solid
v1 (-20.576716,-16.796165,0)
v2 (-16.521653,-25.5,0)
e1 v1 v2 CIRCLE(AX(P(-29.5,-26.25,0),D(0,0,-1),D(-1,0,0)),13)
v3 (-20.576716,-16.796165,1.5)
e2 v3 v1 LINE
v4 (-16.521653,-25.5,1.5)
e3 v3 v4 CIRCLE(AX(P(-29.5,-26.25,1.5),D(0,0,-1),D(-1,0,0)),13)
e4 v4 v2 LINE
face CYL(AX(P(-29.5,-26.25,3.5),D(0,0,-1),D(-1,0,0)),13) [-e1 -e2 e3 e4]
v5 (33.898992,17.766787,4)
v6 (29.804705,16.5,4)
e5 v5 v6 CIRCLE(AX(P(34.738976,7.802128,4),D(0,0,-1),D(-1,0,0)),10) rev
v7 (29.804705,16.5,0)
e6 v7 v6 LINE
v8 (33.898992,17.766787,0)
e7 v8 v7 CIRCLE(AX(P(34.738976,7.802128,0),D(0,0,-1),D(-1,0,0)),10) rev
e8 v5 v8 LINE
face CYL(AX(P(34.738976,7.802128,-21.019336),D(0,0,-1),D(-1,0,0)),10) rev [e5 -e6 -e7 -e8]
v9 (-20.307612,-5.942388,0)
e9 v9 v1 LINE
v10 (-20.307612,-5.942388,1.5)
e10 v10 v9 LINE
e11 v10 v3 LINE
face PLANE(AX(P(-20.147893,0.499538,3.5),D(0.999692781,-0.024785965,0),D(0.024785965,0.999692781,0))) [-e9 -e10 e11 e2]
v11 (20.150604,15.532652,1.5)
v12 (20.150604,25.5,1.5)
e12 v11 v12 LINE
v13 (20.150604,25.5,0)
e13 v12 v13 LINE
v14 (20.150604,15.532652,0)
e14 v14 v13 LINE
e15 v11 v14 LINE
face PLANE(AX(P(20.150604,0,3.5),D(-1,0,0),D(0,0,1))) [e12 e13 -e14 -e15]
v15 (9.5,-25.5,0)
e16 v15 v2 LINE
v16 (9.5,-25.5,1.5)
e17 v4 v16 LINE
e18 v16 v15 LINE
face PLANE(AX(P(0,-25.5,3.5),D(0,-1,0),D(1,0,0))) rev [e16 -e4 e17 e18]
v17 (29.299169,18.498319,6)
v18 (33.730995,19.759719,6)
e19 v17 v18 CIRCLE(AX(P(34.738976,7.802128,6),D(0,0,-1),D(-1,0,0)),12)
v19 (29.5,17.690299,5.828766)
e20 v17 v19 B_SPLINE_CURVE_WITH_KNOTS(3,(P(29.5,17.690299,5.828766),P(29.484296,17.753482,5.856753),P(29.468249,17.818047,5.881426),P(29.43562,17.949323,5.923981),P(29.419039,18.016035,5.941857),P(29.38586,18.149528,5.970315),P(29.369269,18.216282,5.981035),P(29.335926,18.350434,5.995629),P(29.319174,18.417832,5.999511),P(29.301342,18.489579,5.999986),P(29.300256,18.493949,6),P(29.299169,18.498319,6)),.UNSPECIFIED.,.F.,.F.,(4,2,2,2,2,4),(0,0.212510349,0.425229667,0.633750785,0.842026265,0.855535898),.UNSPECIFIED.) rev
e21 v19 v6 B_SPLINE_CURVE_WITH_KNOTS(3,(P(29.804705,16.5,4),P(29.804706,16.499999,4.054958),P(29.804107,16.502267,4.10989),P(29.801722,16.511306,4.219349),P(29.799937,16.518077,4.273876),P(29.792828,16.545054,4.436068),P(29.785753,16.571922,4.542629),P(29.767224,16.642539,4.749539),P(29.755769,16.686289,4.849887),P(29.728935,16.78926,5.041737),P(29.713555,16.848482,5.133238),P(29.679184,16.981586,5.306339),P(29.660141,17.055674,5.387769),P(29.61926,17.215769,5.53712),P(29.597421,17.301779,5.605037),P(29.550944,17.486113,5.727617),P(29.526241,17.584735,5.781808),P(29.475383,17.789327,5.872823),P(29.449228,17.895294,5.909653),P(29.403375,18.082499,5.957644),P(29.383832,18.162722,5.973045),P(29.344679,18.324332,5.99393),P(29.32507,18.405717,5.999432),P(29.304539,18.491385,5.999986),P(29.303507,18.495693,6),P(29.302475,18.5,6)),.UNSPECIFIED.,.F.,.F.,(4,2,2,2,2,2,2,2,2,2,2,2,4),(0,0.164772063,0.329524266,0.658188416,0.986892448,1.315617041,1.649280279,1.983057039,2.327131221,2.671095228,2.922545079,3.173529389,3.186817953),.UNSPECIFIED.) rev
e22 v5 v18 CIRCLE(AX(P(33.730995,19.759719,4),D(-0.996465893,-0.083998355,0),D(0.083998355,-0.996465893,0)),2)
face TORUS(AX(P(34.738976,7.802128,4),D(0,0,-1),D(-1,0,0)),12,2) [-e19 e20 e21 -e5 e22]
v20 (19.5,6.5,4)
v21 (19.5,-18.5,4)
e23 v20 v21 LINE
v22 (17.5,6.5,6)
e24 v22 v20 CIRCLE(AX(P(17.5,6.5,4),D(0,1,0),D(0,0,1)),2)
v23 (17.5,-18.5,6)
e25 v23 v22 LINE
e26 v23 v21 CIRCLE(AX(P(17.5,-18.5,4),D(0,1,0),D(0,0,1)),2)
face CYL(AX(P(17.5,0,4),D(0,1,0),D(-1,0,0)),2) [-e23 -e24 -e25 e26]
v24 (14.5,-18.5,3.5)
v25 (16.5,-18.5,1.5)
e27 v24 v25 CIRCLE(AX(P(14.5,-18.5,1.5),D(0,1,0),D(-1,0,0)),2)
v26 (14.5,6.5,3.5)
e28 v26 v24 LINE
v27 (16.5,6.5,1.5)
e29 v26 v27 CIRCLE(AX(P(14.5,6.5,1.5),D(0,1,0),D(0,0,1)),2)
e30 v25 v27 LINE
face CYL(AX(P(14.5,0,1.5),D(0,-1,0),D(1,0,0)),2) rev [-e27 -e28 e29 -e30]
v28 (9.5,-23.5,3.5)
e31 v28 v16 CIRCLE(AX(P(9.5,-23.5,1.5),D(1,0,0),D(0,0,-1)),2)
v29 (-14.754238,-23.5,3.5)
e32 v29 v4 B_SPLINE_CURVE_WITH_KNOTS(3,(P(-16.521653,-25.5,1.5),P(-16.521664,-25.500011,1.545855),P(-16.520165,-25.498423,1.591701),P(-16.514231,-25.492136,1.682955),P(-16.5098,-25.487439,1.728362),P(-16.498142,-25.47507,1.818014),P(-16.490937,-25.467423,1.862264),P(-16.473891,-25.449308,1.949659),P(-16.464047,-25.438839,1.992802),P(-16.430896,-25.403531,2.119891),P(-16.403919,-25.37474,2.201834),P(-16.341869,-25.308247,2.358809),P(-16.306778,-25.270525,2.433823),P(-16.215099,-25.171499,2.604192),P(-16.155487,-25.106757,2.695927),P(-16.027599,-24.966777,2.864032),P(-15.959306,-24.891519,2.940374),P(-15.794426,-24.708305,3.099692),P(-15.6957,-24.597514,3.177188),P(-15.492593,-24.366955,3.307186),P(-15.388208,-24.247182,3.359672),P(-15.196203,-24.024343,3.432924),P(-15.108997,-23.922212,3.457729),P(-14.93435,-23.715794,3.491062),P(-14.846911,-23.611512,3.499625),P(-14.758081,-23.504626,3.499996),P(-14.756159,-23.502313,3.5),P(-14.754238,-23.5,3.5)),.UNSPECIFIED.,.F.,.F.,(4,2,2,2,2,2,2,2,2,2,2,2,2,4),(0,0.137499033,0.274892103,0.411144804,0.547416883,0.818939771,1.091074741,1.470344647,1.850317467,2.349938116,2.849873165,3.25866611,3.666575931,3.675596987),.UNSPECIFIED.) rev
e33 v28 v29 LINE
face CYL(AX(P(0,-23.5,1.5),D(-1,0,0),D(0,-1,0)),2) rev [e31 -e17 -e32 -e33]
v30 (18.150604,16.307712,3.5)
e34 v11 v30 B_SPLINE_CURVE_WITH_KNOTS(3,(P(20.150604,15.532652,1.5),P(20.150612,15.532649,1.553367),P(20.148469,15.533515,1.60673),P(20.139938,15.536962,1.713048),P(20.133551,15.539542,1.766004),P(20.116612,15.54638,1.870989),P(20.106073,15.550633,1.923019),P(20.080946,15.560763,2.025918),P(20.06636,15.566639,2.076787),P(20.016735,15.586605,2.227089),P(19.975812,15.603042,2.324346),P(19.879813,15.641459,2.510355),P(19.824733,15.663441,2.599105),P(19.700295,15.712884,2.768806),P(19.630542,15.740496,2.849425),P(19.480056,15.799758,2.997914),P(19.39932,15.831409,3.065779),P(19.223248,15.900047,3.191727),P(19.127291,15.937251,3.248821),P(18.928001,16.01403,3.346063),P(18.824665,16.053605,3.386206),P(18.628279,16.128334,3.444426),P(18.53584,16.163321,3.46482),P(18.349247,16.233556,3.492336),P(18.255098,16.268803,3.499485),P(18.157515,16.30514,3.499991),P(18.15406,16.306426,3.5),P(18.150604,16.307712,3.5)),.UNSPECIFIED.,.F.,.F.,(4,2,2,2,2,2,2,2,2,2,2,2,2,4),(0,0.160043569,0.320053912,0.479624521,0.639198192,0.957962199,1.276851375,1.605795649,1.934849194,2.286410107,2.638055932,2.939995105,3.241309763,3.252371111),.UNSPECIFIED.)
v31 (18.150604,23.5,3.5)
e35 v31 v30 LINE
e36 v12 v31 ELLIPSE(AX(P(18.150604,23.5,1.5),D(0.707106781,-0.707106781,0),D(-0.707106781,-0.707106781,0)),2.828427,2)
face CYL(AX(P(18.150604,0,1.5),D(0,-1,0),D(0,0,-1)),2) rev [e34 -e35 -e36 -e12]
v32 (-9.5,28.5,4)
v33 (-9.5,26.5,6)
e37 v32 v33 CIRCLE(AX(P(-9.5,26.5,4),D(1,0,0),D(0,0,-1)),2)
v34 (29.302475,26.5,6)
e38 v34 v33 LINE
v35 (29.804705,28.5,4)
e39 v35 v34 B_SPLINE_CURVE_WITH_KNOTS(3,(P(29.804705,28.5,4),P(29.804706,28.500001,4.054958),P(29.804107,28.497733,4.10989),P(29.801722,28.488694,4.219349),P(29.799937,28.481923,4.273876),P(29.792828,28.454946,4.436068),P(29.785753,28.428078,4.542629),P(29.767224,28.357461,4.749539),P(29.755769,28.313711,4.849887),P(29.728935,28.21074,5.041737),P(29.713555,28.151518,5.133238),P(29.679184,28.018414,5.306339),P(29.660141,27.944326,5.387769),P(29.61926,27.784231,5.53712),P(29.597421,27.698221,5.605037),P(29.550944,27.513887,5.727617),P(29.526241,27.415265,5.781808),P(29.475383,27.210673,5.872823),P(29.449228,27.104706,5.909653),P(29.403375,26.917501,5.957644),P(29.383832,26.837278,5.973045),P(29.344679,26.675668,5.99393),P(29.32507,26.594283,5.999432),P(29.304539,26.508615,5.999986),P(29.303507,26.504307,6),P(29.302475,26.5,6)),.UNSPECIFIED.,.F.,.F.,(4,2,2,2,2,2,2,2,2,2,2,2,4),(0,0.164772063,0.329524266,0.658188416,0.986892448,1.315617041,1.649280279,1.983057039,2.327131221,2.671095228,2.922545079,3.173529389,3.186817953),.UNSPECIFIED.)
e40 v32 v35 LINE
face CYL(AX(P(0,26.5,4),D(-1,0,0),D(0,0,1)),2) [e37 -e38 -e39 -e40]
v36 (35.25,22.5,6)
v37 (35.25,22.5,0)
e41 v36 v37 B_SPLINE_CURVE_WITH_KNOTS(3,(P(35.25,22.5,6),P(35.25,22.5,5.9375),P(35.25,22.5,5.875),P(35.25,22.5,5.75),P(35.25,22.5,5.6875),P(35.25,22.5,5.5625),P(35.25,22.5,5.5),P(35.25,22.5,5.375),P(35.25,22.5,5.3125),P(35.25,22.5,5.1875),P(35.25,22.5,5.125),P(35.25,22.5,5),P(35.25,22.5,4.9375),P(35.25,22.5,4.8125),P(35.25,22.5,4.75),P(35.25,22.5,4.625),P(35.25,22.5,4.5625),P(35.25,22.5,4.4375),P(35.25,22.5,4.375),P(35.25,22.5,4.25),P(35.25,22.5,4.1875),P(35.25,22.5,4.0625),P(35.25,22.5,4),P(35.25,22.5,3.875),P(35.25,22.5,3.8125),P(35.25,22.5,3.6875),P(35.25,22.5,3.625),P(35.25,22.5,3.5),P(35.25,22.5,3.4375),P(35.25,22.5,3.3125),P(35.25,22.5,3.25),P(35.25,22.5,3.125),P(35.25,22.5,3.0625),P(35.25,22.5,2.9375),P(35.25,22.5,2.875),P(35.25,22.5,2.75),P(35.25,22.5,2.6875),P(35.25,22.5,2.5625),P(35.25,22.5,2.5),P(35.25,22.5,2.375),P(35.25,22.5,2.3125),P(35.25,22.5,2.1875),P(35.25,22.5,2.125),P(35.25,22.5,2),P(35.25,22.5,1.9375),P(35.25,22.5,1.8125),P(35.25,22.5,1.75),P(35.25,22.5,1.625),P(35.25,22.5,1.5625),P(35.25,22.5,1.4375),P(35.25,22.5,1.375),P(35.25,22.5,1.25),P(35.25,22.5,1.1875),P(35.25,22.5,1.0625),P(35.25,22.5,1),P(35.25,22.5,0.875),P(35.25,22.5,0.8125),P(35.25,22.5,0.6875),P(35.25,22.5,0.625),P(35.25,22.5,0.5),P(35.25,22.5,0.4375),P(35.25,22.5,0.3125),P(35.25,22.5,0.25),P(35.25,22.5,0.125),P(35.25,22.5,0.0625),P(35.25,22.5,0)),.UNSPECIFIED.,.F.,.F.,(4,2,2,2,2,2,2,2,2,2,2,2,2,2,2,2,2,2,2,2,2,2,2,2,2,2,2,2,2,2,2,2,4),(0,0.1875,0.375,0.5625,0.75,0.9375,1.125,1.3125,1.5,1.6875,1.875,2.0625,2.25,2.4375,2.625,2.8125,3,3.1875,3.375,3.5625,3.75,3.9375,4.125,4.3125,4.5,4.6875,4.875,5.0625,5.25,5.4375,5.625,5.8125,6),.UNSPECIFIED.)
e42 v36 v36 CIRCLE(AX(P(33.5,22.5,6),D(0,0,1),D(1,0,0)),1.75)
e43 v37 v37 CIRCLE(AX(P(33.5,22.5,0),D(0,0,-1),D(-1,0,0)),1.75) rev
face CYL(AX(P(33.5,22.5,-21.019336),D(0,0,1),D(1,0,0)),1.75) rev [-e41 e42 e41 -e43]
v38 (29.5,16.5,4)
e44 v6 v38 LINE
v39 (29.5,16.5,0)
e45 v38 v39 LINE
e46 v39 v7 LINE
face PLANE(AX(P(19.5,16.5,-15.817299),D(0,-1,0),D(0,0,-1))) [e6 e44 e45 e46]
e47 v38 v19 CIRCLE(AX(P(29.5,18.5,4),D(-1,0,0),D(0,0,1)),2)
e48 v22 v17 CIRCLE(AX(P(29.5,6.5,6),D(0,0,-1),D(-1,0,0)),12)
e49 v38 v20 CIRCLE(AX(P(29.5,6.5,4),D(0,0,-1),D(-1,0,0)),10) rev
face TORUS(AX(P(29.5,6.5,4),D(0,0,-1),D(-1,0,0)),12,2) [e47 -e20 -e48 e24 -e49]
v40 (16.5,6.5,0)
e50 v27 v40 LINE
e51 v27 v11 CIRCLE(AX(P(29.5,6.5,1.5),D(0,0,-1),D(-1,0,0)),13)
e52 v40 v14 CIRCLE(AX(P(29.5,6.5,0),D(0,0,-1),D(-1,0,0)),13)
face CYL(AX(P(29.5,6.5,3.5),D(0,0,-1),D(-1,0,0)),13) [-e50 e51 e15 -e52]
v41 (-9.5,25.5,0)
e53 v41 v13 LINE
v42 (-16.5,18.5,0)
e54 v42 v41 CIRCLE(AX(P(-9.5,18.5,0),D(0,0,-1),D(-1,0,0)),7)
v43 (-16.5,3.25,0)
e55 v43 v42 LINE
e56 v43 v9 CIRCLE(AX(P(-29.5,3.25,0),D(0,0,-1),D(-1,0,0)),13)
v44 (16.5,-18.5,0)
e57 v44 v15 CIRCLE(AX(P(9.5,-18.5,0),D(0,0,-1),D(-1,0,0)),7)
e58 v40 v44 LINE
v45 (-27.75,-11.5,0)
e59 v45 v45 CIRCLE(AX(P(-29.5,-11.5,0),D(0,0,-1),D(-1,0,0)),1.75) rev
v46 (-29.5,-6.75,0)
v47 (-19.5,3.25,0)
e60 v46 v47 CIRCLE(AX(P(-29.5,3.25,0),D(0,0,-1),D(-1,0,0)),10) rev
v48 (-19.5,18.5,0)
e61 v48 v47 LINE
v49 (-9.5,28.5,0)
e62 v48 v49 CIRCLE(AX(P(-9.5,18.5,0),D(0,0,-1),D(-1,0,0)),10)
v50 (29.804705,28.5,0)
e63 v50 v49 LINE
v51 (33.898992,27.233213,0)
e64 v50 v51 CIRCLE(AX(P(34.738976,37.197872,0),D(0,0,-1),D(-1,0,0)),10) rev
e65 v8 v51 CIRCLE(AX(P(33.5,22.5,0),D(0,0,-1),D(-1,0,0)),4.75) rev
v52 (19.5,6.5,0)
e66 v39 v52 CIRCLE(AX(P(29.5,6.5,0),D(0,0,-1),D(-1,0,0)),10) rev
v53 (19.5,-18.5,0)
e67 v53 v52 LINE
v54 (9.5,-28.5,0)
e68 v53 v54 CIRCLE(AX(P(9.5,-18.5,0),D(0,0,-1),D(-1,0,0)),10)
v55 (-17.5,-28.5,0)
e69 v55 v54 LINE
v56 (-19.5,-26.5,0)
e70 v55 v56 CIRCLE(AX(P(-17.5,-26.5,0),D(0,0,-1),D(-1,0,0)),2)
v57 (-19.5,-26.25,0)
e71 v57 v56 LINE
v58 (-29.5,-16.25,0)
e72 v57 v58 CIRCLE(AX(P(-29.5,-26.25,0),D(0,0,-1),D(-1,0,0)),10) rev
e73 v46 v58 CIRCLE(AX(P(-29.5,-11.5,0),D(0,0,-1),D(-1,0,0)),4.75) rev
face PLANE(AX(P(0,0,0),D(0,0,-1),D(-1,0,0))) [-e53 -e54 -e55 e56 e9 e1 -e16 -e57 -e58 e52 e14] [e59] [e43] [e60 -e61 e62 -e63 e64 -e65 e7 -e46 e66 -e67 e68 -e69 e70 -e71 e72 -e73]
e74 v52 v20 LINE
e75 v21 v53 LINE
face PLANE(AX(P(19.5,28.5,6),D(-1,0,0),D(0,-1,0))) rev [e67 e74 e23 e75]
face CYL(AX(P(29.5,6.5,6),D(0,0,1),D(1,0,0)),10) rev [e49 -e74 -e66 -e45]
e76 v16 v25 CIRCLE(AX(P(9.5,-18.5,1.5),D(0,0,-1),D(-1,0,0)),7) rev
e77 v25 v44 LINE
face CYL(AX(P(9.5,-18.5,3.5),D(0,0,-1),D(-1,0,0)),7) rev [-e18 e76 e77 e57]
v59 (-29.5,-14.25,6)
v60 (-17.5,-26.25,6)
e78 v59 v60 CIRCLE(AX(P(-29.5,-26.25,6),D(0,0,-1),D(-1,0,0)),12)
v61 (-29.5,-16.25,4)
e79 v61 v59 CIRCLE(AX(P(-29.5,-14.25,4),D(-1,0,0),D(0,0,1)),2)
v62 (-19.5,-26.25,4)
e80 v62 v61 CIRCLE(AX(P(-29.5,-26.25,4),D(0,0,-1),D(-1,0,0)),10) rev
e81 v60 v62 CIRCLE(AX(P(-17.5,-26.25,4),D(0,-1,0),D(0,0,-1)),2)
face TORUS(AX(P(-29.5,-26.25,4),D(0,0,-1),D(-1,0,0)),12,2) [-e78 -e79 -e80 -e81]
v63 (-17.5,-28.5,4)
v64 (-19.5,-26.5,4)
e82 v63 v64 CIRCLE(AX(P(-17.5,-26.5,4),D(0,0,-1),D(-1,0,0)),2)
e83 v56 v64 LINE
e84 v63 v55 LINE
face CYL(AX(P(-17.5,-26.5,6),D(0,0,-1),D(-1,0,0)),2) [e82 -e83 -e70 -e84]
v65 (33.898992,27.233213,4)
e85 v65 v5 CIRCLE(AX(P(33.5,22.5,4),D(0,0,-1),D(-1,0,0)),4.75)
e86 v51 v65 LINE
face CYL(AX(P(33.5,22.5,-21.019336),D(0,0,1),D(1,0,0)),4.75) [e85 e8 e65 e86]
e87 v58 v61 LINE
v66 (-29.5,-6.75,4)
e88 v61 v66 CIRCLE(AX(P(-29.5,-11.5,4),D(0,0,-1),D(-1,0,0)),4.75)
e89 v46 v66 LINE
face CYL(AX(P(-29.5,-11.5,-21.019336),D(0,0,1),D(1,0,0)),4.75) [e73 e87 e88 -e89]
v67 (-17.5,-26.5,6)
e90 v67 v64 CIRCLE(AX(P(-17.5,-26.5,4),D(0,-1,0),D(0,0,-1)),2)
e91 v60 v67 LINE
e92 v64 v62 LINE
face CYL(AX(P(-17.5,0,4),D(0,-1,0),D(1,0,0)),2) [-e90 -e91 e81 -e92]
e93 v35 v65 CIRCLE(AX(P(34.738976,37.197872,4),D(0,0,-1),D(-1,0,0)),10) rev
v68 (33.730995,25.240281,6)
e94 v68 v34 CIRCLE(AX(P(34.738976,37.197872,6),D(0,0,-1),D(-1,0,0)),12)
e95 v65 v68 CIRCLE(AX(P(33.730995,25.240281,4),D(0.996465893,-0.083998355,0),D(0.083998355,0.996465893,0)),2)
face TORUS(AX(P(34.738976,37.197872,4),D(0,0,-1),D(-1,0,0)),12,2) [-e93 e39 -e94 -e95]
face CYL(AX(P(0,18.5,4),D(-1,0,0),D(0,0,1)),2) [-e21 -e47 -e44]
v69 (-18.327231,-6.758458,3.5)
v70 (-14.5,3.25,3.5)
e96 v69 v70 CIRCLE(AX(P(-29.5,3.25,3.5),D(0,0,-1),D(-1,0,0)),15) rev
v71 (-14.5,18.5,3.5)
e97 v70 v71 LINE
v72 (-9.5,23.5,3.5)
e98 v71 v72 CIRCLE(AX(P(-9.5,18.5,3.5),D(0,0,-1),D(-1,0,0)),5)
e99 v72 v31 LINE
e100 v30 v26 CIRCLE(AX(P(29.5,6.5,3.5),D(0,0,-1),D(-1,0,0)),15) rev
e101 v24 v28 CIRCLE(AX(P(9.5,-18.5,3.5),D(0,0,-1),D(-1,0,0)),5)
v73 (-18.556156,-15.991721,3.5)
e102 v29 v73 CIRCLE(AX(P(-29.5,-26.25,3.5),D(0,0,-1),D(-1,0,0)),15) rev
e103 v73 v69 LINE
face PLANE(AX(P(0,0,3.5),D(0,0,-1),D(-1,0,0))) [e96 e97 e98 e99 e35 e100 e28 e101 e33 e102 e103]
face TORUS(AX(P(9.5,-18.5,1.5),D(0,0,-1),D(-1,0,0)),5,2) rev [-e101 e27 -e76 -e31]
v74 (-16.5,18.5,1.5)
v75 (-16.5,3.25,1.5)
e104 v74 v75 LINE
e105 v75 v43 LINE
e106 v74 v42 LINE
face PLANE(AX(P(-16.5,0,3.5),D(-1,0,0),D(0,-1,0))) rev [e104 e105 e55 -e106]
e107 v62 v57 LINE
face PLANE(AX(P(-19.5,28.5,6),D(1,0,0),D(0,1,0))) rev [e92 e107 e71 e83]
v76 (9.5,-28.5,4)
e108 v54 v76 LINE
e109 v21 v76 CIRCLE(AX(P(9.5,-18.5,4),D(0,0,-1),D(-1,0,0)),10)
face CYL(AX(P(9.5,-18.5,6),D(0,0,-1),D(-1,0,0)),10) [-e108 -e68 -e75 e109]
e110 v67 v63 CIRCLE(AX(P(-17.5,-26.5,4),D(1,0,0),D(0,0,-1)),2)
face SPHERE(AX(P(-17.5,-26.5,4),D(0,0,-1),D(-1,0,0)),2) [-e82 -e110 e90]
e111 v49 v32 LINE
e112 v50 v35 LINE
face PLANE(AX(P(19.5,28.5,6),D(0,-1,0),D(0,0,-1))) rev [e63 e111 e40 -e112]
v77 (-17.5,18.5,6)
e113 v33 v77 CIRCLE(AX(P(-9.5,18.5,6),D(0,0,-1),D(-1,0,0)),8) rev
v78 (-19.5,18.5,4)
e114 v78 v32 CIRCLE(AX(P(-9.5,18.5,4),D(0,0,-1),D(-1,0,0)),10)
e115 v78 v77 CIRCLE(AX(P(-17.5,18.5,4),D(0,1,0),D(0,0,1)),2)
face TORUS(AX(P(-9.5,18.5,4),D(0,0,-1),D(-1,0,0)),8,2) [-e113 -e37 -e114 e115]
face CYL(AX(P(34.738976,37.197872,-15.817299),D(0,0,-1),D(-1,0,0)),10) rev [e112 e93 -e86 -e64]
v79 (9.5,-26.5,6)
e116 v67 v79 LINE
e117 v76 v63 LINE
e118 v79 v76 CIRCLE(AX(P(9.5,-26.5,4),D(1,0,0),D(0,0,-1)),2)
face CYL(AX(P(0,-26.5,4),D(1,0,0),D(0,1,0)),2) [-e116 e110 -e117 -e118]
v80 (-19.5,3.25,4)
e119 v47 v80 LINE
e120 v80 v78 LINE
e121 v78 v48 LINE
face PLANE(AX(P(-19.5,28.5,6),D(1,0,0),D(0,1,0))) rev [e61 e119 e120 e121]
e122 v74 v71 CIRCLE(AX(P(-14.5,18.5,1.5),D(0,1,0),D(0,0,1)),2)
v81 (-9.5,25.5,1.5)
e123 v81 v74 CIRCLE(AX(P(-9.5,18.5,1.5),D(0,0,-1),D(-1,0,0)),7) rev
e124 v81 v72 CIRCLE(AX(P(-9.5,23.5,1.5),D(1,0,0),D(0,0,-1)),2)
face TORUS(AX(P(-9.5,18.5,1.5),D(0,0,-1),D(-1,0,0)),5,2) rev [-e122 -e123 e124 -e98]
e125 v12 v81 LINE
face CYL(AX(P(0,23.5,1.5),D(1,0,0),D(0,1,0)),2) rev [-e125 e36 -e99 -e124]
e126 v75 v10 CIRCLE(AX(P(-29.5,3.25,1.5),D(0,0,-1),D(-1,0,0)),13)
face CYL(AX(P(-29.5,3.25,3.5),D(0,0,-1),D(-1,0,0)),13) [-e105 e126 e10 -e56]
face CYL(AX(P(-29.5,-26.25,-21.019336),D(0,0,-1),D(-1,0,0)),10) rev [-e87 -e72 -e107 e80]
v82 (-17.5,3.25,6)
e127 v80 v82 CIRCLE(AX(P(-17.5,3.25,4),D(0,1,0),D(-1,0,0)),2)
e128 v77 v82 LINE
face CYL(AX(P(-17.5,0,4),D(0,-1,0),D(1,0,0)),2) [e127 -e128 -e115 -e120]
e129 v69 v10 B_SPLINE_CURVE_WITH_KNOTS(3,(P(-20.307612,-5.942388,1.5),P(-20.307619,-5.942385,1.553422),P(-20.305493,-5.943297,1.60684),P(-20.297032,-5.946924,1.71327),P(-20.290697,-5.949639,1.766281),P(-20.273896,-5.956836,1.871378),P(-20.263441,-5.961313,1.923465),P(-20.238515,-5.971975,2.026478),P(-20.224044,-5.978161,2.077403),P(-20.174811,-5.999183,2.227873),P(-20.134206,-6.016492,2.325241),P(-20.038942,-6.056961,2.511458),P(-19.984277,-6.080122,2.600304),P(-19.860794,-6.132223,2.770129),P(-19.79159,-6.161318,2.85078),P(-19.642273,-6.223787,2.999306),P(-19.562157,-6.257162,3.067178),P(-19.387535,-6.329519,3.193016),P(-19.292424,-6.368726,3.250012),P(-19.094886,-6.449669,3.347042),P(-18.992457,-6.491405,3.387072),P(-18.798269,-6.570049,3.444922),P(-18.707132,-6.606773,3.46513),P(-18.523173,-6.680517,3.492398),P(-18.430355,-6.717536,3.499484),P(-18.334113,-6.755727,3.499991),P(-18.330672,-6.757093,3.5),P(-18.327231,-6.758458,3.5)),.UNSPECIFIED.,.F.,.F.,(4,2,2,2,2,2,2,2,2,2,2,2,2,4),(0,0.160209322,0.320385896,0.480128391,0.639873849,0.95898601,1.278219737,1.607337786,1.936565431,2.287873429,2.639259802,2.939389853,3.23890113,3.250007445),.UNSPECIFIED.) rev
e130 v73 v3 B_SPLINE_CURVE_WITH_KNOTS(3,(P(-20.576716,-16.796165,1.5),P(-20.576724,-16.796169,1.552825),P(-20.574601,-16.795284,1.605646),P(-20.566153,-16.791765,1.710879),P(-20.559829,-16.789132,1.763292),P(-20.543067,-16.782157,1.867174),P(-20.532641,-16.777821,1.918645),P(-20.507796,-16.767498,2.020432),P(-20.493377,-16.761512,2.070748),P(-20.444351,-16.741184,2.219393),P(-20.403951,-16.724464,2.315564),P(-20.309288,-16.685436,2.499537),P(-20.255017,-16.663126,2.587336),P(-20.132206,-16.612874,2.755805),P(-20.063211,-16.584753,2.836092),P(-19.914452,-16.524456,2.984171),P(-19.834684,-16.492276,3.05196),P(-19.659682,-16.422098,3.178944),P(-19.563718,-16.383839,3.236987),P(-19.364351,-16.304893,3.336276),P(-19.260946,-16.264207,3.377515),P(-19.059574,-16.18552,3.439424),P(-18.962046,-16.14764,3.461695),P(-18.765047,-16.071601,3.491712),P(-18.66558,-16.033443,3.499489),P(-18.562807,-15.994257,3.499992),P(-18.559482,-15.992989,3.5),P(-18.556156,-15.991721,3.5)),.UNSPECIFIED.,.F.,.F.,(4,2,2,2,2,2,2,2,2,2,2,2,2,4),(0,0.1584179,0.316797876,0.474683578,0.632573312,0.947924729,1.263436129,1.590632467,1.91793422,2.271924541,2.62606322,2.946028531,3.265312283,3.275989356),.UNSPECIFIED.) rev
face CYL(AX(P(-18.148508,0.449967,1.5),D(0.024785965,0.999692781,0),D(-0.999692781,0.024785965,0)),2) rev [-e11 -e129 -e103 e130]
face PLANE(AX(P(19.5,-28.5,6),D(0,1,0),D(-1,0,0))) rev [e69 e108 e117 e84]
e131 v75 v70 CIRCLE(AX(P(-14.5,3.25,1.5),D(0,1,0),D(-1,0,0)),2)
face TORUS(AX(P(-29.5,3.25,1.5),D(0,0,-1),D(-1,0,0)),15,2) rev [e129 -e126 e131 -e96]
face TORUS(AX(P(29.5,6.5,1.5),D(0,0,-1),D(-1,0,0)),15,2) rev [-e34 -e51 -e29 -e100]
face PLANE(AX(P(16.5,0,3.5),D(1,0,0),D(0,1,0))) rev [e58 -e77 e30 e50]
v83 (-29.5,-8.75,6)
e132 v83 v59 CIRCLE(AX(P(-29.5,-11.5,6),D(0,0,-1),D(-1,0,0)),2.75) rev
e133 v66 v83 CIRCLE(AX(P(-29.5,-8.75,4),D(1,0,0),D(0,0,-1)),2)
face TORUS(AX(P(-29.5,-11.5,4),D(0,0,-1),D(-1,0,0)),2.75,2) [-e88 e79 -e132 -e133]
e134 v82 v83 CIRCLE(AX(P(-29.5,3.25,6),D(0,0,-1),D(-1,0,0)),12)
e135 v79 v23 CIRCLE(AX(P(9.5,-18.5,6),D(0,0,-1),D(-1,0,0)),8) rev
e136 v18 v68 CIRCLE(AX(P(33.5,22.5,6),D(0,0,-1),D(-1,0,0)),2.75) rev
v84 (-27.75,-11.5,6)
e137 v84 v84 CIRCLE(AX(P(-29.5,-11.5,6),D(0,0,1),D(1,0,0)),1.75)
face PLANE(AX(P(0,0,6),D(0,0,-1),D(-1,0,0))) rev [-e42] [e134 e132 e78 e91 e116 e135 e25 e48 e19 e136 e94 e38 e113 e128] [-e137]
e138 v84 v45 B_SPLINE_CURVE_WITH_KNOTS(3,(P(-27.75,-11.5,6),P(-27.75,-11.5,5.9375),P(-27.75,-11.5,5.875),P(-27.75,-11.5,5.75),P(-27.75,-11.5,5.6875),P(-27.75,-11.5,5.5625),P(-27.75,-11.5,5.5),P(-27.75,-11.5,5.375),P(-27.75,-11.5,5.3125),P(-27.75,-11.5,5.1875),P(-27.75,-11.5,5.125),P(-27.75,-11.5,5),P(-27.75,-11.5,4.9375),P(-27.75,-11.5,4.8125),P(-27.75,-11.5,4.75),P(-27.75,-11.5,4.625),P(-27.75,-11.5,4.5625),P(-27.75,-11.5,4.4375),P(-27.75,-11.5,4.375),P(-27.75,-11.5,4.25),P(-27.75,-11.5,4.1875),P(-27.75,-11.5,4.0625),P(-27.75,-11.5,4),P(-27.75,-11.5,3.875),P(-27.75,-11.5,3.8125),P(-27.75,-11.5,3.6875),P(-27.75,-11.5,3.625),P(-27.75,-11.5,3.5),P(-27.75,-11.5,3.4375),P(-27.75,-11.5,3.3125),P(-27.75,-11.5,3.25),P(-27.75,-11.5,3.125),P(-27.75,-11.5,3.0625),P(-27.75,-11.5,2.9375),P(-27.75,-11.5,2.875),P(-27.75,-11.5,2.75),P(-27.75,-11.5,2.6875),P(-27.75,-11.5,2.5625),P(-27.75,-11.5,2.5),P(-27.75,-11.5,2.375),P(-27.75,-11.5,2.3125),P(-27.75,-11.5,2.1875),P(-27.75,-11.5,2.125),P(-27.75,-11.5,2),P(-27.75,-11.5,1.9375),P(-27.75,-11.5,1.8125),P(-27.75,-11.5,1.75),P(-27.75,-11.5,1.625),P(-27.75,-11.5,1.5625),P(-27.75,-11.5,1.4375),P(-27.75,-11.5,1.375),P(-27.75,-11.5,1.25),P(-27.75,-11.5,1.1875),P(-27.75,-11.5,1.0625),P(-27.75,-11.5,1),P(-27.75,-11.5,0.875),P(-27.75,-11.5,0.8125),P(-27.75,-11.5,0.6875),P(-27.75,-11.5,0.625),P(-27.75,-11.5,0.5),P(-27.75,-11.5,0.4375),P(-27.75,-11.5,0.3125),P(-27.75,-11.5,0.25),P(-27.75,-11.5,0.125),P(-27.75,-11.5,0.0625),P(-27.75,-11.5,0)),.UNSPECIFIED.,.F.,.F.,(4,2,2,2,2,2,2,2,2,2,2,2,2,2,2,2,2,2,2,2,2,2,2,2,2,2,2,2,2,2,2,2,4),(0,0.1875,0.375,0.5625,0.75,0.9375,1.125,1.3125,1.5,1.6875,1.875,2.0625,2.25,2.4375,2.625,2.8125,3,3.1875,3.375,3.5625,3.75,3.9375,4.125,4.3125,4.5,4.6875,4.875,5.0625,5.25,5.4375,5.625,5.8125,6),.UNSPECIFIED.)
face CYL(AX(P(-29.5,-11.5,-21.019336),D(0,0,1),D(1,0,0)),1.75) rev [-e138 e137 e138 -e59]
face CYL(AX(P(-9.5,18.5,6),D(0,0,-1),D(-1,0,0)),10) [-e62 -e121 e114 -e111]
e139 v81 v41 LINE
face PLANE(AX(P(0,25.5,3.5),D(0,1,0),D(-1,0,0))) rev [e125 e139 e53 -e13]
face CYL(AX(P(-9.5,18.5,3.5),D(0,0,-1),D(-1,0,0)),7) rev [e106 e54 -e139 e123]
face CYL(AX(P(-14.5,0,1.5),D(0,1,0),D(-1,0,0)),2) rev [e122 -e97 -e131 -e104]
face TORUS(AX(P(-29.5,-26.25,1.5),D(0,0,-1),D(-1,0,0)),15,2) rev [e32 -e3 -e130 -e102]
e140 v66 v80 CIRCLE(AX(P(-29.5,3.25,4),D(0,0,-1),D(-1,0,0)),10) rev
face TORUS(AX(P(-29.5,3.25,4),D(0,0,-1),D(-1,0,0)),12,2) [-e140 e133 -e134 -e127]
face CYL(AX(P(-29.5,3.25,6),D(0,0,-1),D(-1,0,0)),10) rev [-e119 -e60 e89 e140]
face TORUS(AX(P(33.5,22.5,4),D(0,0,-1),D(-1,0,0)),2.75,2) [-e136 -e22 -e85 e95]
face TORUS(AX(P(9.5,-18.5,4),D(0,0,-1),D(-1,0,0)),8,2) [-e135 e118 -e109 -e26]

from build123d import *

# Parameters (mm, degrees)
SKETCH1_W           = 39
SKETCH1_H           = 57
BOSS_EXTRUDE1_DEPTH = 6
SKETCH2_R           = 4.75
SKETCH2_R_2         = 1.75
BOSS_EXTRUDE2_DEPTH = 6
FILLET4_R           = 10
SKETCH4_W           = 10.304705379
SKETCH4_H           = 12
BOSS_EXTRUDE3_DEPTH = 6
FILLET5_R           = 10
CUT_EXTRUDE2_DEPTH  = 3.5
FILLET7_R           = 2
FILLET8_R           = 2
FILLET9_R           = 2


with BuildPart() as part:
    # Sketch1 → Boss-Extrude1 (new body)
    with BuildSketch(Plane.XY):
        Rectangle(SKETCH1_W, SKETCH1_H)
    extrude(amount=BOSS_EXTRUDE1_DEPTH)

    # Sketch2 → Boss-Extrude2 (add)
    # profile 1 of 4: a face of its own
    with BuildSketch(Plane.XY.offset(6)):
        with BuildLine():
            ThreePointArc((33.5, 17.75), (28.75, 22.5), (33.5, 27.25))
            Line((33.5, 27.25), (19.5, 27.25))
            Line((19.5, 27.25), (19.5, 17.75))
            Line((19.5, 17.75), (33.5, 17.75))
        make_face()
    # profile 2 of 4: a face of its own
    with BuildSketch(Plane.XY.offset(6)):
        with BuildLine():
            Line((-19.5, -6.75), (-29.5, -6.75))
            ThreePointArc((-29.5, -6.75), (-26.141242789, -8.141242789), (-24.75, -11.5))
            ThreePointArc((-24.75, -11.5), (-26.141242789, -14.858757211), (-29.5, -16.25))
            Line((-29.5, -16.25), (-19.5, -16.25))
            Line((-19.5, -16.25), (-19.5, -6.75))
        make_face()
    # profile 3 of 4: a face of its own
    with BuildSketch(Plane.XY.offset(6)):
        with Locations((-29.5, -11.5)):
            Circle(SKETCH2_R)
        with Locations((-29.5, -11.5)):
            Circle(SKETCH2_R_2, mode=Mode.SUBTRACT)
    # profile 4 of 4: a face of its own
    with BuildSketch(Plane.XY.offset(6)):
        with Locations((33.5, 22.5)):
            Circle(SKETCH2_R)
        with Locations((33.5, 22.5)):
            Circle(SKETCH2_R_2, mode=Mode.SUBTRACT)
    extrude(amount=-BOSS_EXTRUDE2_DEPTH)

    # Fillet4
    fillet4_edges = [part.edges().sort_by_distance(p)[0] for p in [
        (-19.5, 28.5, 3),
        (19.5, -28.5, 3),
    ]]
    fillet(fillet4_edges, radius=FILLET4_R)

    # Sketch4 → Boss-Extrude3 (add)
    with BuildSketch(Plane.XY.offset(6)):
        with Locations((24.652352689, 22.5)):
            Rectangle(SKETCH4_W, SKETCH4_H)
    extrude(amount=-BOSS_EXTRUDE3_DEPTH)

    # Fillet5
    # the kernel refuses this fillet: 10 mm, written as the material it adds along each edge
    with BuildSketch(Plane(origin=(29.804705379, 17.75, 6), x_dir=(0, -1, 0), z_dir=(0, 0, -1))) as fillet5_piece_1:
        with BuildLine():
            CenterArc((9.947871925, -4.934270359), FILLET5_R, 150.433919307, 24.747651836)
            Line((-0.016787007, -4.094286808), (-1.0132529, -4.010288453))
            ThreePointArc((-1.0132529, -4.010288453), (-1, -3.695294621), (-1, 0))
            Line((-1, 0), (0, 1))
            ThreePointArc((0, 1), (0.625, 1), (0.380212808, 0.493427036))
            Line((0.380212808, 0.493427036), (1.25, 0))
        make_face()
    extrude(amount=6)
    with BuildSketch(Plane(origin=(29.804705379, 27.25, 0), x_dir=(0.9999915946740242, -0.004100070889875189, 0), z_dir=(0, 0, 1))) as fillet5_piece_2:
        with BuildLine():
            CenterArc((4.893441905, 9.968019168), FILLET5_R, 240.668836723, 24.747651836)
            Line((-0.005125089, 1.249989493), (-0.494981788, 0.378186526))
            ThreePointArc((-0.494981788, 0.378186526), (-1.002554139, 0.620894676), (-0.999991595, -0.004100071))
            Line((-0.999991595, -0.004100071), (0.004100071, -0.999991595))
            ThreePointArc((0.004100071, -0.999991595), (3.699363631, -0.984840625), (4.014409153, -0.996801917))
            Line((4.014409153, -0.996801917), (4.094321222, 0))
        make_face()
    extrude(amount=6)
    with BuildSketch(Plane(origin=(19.5, 16.5, 6), x_dir=(0, -1, 0), z_dir=(0, 0, -1)), Plane(origin=(-19.5, -6.75, 6), x_dir=(0, 1, 0), z_dir=(0, 0, -1)), Plane(origin=(-19.5, -16.25, 6), x_dir=(-1, 0, 0), z_dir=(0, 0, -1))) as fillet5_piece_3:
        with BuildLine():
            CenterArc((FILLET5_R, -FILLET5_R), FILLET5_R, 90, 90)
            Line((0, -FILLET5_R), (-FILLET5_R * 0.02, -FILLET5_R))
            Line((-FILLET5_R * 0.02, -FILLET5_R), (-FILLET5_R * 0.02, FILLET5_R * 0.02))
            Line((-FILLET5_R * 0.02, FILLET5_R * 0.02), (FILLET5_R, FILLET5_R * 0.02))
            Line((FILLET5_R, FILLET5_R * 0.02), (FILLET5_R, 0))
        make_face()
    extrude(amount=6)

    # Sketch5 → Cut-Extrude2 (cut)
    with BuildSketch(Plane(origin=(0, 0, 0), x_dir=(-1, 0, 0), z_dir=(0, 0, -1))):
        with BuildLine():
            Line((16.5, 3.25), (16.5, 18.5))
            ThreePointArc((16.5, 18.5), (14.449747468, 23.449747468), (9.5, 25.5))
            Line((9.5, 25.5), (-20.150604469, 25.5))
            Line((-20.150604469, 25.5), (-20.150604469, 15.532652058))
            ThreePointArc((-20.150604469, 15.532652058), (-17.447155068, 11.371234859), (-16.5, 6.5))
            Line((-16.5, 6.5), (-16.5, -18.5))
            ThreePointArc((-16.5, -18.5), (-14.449747468, -23.449747468), (-9.5, -25.5))
            Line((-9.5, -25.5), (16.521652648, -25.5))
            ThreePointArc((16.521652648, -25.5), (17.716131688, -20.759968343), (20.576715851, -16.796164799))
            Line((20.576715851, -16.796164799), (20.307611845, -5.942388155))
            ThreePointArc((20.307611845, -5.942388155), (17.489566077, -1.724884621), (16.5, 3.25))
        make_face()
    extrude(amount=-CUT_EXTRUDE2_DEPTH, mode=Mode.SUBTRACT)

    # Fillet7
    fillet7_edges = [part.edges().sort_by_distance(p)[0] for p in [
        (-19.5, -28.5, 3),
    ]]
    fillet(fillet7_edges, radius=FILLET7_R)

    # Fillet8
    # the kernel refuses this fillet: 2 mm, written as the material it takes off along each edge
    with BuildSketch(Plane(origin=(34.738975739, 7.802128075, 6), x_dir=(-0.8500291529283407, 0.5267356444858536, 0), z_dir=(-0.5267356444858536, -0.8500291529283407, 0))) as fillet8_piece_1:
        with BuildLine():
            CenterArc((10 + FILLET8_R, FILLET8_R), FILLET8_R, 180, 90)
            Line((10, FILLET8_R), (10, 0))
            Line((10, 0), (10 + FILLET8_R, 0))
        make_face()
    revolve(axis=Axis((34.738975739, 7.802128075, 6), (0, 0, -1)), revolution_arc=53.396411501, mode=Mode.SUBTRACT)
    with BuildSketch(Plane(origin=(34.738975739, 37.197871925, 6), x_dir=(-0.8500291529284019, -0.5267356444857548, 0), z_dir=(-0.5267356444857548, 0.8500291529284019, 0))) as fillet8_piece_2:
        with BuildLine():
            CenterArc((10 + FILLET8_R, -FILLET8_R), FILLET8_R, 90, 90)
            Line((10, -FILLET8_R), (10, 0))
            Line((10, 0), (10 + FILLET8_R, 0))
        make_face()
    revolve(axis=Axis((34.738975739, 37.197871925, 6), (0, 0, 1)), revolution_arc=53.396411501, mode=Mode.SUBTRACT)
    with BuildSketch(Plane(origin=(29.5, 6.5, 6), x_dir=(-1, 0, 0), z_dir=(0, -1, 0))) as fillet8_piece_3:
        with BuildLine():
            CenterArc((10 + FILLET8_R, FILLET8_R), FILLET8_R, 180, 90)
            Line((10, FILLET8_R), (10, 0))
            Line((10, 0), (10 + FILLET8_R, 0))
        make_face()
    revolve(axis=Axis((29.5, 6.5, 6), (0, 0, -1)), revolution_arc=90, mode=Mode.SUBTRACT)
    with BuildSketch(Plane(origin=(19.5, -18.5, 6), x_dir=(-1, 0, 0), z_dir=(0, 1, 0))) as fillet8_piece_4:
        with BuildLine():
            CenterArc((FILLET8_R, -FILLET8_R), FILLET8_R, 90, 90)
            Line((0, -FILLET8_R), (0, 0))
            Line((0, 0), (FILLET8_R, 0))
        make_face()
    extrude(amount=25, mode=Mode.SUBTRACT)
    with BuildSketch(Plane(origin=(9.5, -18.5, 6), x_dir=(0, -1, 0), z_dir=(-1, 0, 0))) as fillet8_piece_5:
        with BuildLine():
            CenterArc((10 - FILLET8_R, -FILLET8_R), FILLET8_R, 0, 90)
            Line((10, -FILLET8_R), (10, 0))
            Line((10, 0), (10 - FILLET8_R, 0))
        make_face()
    revolve(axis=Axis((9.5, -18.5, 6), (0, 0, 1)), revolution_arc=90, mode=Mode.SUBTRACT)
    with BuildSketch(Plane(origin=(-17.5, -28.5, 6), x_dir=(0, 1, 0), z_dir=(1, 0, 0))) as fillet8_piece_6:
        with BuildLine():
            CenterArc((FILLET8_R, -FILLET8_R), FILLET8_R, 90, 90)
            Line((0, -FILLET8_R), (0, 0))
            Line((0, 0), (FILLET8_R, 0))
        make_face()
    extrude(amount=27, mode=Mode.SUBTRACT)
    with BuildSketch(Plane(origin=(-17.5, -26.5, 6), x_dir=(-1, 0, 0), z_dir=(0, 1, 0))) as fillet8_piece_7:
        with BuildLine():
            CenterArc((2 - FILLET8_R, -FILLET8_R), FILLET8_R, 0, 90)
            Line((2, -FILLET8_R), (2, 0))
            Line((2, 0), (2 - FILLET8_R, 0))
        make_face()
    revolve(axis=Axis((-17.5, -26.5, 6), (0, 0, 1)), revolution_arc=90, mode=Mode.SUBTRACT)
    with BuildSketch(Plane(origin=(-19.5, -26.25, 6), x_dir=(1, 0, 0), z_dir=(0, -1, 0))) as fillet8_piece_8:
        with BuildLine():
            CenterArc((FILLET8_R, -FILLET8_R), FILLET8_R, 90, 90)
            Line((0, -FILLET8_R), (0, 0))
            Line((0, 0), (FILLET8_R, 0))
        make_face()
    extrude(amount=0.25, mode=Mode.SUBTRACT)
    with BuildSketch(Plane(origin=(-29.5, -26.25, 6), x_dir=(0, 1, 0), z_dir=(-1, 0, 0))) as fillet8_piece_9:
        with BuildLine():
            CenterArc((10 + FILLET8_R, FILLET8_R), FILLET8_R, 180, 90)
            Line((10, FILLET8_R), (10, 0))
            Line((10, 0), (10 + FILLET8_R, 0))
        make_face()
    revolve(axis=Axis((-29.5, -26.25, 6), (0, 0, -1)), revolution_arc=90, mode=Mode.SUBTRACT)
    with BuildSketch(Plane(origin=(-29.5, -11.5, 6), x_dir=(0, 1, 0), z_dir=(1, 0, 0))) as fillet8_piece_10:
        with BuildLine():
            CenterArc((4.75 - FILLET8_R, -FILLET8_R), FILLET8_R, 0, 90)
            Line((4.75, -FILLET8_R), (4.75, 0))
            Line((4.75, 0), (4.75 - FILLET8_R, 0))
        make_face()
    revolve(axis=Axis((-29.5, -11.5, 6), (0, 0, 1)), revolution_arc=180, mode=Mode.SUBTRACT)
    with BuildSketch(Plane(origin=(-29.5, 3.25, 6), x_dir=(1, 0, 0), z_dir=(0, 1, 0))) as fillet8_piece_11:
        with BuildLine():
            CenterArc((10 + FILLET8_R, FILLET8_R), FILLET8_R, 180, 90)
            Line((10, FILLET8_R), (10, 0))
            Line((10, 0), (10 + FILLET8_R, 0))
        make_face()
    revolve(axis=Axis((-29.5, 3.25, 6), (0, 0, -1)), revolution_arc=90, mode=Mode.SUBTRACT)
    with BuildSketch(Plane(origin=(-19.5, 18.5, 6), x_dir=(1, 0, 0), z_dir=(0, -1, 0))) as fillet8_piece_12:
        with BuildLine():
            CenterArc((FILLET8_R, -FILLET8_R), FILLET8_R, 90, 90)
            Line((0, -FILLET8_R), (0, 0))
            Line((0, 0), (FILLET8_R, 0))
        make_face()
    extrude(amount=15.25, mode=Mode.SUBTRACT)
    with BuildSketch(Plane(origin=(-9.5, 18.5, 6), x_dir=(0, 1, 0), z_dir=(1, 0, 0))) as fillet8_piece_13:
        with BuildLine():
            CenterArc((10 - FILLET8_R, -FILLET8_R), FILLET8_R, 0, 90)
            Line((10, -FILLET8_R), (10, 0))
            Line((10, 0), (10 - FILLET8_R, 0))
        make_face()
    revolve(axis=Axis((-9.5, 18.5, 6), (0, 0, 1)), revolution_arc=90, mode=Mode.SUBTRACT)
    with BuildSketch(Plane(origin=(33.5, 22.5, 6), x_dir=(0.08399835516458835, 0.9964658932094184, 0), z_dir=(-0.9964658932094184, 0.08399835516458835, 0))) as fillet8_piece_14:
        with BuildLine():
            CenterArc((4.75 - FILLET8_R, FILLET8_R), FILLET8_R, 270, 90)
            Line((4.75, FILLET8_R), (4.75, 0))
            Line((4.75, 0), (4.75 - FILLET8_R, 0))
        make_face()
    revolve(axis=Axis((33.5, 22.5, 6), (0, 0, -1)), revolution_arc=170.363142288, mode=Mode.SUBTRACT)
    with BuildSketch(Plane(origin=(-9.5, 28.5, 6), x_dir=(0, -1, 0), z_dir=(1, 0, 0))) as fillet8_piece_15:
        with BuildLine():
            CenterArc((FILLET8_R, FILLET8_R), FILLET8_R, 180, 90)
            Line((0, FILLET8_R), (0, 0))
            Line((0, 0), (FILLET8_R, 0))
        make_face()
    extrude(amount=44.304705379, mode=Mode.SUBTRACT)
    with BuildSketch(Plane(origin=(34.804705379, 16.5, 6), x_dir=(0, 1, 0), z_dir=(-1, 0, 0))) as fillet8_piece_16:
        with BuildLine():
            CenterArc((FILLET8_R, FILLET8_R), FILLET8_R, 180, 90)
            Line((0, FILLET8_R), (0, 0))
            Line((0, 0), (FILLET8_R, 0))
        make_face()
    extrude(amount=5.304705379, mode=Mode.SUBTRACT)

    # Fillet9
    fillet9_edges = [part.edges().sort_by_distance(p)[0] for p in [
        (-16.5, 10.875, 3.5),
        (-3.510826324, -25.5, 3.5),
        (14.449747468, -23.449747468, 3.5),
        (16.5, -6, 3.5),
        (5.325302234, 25.5, 3.5),
        (-14.449747468, 23.449747468, 3.5),
        (-17.489566077, -1.724884621, 3.5),
        (-20.442163848, -11.369276477, 3.5),
        (-17.716131688, -20.759968343, 3.5),
        (17.447155068, 11.371234859, 3.5),
        (20.150604469, 20.516326029, 3.5),
    ]]
    fillet(fillet9_edges, radius=FILLET9_R)


solid = part.part
